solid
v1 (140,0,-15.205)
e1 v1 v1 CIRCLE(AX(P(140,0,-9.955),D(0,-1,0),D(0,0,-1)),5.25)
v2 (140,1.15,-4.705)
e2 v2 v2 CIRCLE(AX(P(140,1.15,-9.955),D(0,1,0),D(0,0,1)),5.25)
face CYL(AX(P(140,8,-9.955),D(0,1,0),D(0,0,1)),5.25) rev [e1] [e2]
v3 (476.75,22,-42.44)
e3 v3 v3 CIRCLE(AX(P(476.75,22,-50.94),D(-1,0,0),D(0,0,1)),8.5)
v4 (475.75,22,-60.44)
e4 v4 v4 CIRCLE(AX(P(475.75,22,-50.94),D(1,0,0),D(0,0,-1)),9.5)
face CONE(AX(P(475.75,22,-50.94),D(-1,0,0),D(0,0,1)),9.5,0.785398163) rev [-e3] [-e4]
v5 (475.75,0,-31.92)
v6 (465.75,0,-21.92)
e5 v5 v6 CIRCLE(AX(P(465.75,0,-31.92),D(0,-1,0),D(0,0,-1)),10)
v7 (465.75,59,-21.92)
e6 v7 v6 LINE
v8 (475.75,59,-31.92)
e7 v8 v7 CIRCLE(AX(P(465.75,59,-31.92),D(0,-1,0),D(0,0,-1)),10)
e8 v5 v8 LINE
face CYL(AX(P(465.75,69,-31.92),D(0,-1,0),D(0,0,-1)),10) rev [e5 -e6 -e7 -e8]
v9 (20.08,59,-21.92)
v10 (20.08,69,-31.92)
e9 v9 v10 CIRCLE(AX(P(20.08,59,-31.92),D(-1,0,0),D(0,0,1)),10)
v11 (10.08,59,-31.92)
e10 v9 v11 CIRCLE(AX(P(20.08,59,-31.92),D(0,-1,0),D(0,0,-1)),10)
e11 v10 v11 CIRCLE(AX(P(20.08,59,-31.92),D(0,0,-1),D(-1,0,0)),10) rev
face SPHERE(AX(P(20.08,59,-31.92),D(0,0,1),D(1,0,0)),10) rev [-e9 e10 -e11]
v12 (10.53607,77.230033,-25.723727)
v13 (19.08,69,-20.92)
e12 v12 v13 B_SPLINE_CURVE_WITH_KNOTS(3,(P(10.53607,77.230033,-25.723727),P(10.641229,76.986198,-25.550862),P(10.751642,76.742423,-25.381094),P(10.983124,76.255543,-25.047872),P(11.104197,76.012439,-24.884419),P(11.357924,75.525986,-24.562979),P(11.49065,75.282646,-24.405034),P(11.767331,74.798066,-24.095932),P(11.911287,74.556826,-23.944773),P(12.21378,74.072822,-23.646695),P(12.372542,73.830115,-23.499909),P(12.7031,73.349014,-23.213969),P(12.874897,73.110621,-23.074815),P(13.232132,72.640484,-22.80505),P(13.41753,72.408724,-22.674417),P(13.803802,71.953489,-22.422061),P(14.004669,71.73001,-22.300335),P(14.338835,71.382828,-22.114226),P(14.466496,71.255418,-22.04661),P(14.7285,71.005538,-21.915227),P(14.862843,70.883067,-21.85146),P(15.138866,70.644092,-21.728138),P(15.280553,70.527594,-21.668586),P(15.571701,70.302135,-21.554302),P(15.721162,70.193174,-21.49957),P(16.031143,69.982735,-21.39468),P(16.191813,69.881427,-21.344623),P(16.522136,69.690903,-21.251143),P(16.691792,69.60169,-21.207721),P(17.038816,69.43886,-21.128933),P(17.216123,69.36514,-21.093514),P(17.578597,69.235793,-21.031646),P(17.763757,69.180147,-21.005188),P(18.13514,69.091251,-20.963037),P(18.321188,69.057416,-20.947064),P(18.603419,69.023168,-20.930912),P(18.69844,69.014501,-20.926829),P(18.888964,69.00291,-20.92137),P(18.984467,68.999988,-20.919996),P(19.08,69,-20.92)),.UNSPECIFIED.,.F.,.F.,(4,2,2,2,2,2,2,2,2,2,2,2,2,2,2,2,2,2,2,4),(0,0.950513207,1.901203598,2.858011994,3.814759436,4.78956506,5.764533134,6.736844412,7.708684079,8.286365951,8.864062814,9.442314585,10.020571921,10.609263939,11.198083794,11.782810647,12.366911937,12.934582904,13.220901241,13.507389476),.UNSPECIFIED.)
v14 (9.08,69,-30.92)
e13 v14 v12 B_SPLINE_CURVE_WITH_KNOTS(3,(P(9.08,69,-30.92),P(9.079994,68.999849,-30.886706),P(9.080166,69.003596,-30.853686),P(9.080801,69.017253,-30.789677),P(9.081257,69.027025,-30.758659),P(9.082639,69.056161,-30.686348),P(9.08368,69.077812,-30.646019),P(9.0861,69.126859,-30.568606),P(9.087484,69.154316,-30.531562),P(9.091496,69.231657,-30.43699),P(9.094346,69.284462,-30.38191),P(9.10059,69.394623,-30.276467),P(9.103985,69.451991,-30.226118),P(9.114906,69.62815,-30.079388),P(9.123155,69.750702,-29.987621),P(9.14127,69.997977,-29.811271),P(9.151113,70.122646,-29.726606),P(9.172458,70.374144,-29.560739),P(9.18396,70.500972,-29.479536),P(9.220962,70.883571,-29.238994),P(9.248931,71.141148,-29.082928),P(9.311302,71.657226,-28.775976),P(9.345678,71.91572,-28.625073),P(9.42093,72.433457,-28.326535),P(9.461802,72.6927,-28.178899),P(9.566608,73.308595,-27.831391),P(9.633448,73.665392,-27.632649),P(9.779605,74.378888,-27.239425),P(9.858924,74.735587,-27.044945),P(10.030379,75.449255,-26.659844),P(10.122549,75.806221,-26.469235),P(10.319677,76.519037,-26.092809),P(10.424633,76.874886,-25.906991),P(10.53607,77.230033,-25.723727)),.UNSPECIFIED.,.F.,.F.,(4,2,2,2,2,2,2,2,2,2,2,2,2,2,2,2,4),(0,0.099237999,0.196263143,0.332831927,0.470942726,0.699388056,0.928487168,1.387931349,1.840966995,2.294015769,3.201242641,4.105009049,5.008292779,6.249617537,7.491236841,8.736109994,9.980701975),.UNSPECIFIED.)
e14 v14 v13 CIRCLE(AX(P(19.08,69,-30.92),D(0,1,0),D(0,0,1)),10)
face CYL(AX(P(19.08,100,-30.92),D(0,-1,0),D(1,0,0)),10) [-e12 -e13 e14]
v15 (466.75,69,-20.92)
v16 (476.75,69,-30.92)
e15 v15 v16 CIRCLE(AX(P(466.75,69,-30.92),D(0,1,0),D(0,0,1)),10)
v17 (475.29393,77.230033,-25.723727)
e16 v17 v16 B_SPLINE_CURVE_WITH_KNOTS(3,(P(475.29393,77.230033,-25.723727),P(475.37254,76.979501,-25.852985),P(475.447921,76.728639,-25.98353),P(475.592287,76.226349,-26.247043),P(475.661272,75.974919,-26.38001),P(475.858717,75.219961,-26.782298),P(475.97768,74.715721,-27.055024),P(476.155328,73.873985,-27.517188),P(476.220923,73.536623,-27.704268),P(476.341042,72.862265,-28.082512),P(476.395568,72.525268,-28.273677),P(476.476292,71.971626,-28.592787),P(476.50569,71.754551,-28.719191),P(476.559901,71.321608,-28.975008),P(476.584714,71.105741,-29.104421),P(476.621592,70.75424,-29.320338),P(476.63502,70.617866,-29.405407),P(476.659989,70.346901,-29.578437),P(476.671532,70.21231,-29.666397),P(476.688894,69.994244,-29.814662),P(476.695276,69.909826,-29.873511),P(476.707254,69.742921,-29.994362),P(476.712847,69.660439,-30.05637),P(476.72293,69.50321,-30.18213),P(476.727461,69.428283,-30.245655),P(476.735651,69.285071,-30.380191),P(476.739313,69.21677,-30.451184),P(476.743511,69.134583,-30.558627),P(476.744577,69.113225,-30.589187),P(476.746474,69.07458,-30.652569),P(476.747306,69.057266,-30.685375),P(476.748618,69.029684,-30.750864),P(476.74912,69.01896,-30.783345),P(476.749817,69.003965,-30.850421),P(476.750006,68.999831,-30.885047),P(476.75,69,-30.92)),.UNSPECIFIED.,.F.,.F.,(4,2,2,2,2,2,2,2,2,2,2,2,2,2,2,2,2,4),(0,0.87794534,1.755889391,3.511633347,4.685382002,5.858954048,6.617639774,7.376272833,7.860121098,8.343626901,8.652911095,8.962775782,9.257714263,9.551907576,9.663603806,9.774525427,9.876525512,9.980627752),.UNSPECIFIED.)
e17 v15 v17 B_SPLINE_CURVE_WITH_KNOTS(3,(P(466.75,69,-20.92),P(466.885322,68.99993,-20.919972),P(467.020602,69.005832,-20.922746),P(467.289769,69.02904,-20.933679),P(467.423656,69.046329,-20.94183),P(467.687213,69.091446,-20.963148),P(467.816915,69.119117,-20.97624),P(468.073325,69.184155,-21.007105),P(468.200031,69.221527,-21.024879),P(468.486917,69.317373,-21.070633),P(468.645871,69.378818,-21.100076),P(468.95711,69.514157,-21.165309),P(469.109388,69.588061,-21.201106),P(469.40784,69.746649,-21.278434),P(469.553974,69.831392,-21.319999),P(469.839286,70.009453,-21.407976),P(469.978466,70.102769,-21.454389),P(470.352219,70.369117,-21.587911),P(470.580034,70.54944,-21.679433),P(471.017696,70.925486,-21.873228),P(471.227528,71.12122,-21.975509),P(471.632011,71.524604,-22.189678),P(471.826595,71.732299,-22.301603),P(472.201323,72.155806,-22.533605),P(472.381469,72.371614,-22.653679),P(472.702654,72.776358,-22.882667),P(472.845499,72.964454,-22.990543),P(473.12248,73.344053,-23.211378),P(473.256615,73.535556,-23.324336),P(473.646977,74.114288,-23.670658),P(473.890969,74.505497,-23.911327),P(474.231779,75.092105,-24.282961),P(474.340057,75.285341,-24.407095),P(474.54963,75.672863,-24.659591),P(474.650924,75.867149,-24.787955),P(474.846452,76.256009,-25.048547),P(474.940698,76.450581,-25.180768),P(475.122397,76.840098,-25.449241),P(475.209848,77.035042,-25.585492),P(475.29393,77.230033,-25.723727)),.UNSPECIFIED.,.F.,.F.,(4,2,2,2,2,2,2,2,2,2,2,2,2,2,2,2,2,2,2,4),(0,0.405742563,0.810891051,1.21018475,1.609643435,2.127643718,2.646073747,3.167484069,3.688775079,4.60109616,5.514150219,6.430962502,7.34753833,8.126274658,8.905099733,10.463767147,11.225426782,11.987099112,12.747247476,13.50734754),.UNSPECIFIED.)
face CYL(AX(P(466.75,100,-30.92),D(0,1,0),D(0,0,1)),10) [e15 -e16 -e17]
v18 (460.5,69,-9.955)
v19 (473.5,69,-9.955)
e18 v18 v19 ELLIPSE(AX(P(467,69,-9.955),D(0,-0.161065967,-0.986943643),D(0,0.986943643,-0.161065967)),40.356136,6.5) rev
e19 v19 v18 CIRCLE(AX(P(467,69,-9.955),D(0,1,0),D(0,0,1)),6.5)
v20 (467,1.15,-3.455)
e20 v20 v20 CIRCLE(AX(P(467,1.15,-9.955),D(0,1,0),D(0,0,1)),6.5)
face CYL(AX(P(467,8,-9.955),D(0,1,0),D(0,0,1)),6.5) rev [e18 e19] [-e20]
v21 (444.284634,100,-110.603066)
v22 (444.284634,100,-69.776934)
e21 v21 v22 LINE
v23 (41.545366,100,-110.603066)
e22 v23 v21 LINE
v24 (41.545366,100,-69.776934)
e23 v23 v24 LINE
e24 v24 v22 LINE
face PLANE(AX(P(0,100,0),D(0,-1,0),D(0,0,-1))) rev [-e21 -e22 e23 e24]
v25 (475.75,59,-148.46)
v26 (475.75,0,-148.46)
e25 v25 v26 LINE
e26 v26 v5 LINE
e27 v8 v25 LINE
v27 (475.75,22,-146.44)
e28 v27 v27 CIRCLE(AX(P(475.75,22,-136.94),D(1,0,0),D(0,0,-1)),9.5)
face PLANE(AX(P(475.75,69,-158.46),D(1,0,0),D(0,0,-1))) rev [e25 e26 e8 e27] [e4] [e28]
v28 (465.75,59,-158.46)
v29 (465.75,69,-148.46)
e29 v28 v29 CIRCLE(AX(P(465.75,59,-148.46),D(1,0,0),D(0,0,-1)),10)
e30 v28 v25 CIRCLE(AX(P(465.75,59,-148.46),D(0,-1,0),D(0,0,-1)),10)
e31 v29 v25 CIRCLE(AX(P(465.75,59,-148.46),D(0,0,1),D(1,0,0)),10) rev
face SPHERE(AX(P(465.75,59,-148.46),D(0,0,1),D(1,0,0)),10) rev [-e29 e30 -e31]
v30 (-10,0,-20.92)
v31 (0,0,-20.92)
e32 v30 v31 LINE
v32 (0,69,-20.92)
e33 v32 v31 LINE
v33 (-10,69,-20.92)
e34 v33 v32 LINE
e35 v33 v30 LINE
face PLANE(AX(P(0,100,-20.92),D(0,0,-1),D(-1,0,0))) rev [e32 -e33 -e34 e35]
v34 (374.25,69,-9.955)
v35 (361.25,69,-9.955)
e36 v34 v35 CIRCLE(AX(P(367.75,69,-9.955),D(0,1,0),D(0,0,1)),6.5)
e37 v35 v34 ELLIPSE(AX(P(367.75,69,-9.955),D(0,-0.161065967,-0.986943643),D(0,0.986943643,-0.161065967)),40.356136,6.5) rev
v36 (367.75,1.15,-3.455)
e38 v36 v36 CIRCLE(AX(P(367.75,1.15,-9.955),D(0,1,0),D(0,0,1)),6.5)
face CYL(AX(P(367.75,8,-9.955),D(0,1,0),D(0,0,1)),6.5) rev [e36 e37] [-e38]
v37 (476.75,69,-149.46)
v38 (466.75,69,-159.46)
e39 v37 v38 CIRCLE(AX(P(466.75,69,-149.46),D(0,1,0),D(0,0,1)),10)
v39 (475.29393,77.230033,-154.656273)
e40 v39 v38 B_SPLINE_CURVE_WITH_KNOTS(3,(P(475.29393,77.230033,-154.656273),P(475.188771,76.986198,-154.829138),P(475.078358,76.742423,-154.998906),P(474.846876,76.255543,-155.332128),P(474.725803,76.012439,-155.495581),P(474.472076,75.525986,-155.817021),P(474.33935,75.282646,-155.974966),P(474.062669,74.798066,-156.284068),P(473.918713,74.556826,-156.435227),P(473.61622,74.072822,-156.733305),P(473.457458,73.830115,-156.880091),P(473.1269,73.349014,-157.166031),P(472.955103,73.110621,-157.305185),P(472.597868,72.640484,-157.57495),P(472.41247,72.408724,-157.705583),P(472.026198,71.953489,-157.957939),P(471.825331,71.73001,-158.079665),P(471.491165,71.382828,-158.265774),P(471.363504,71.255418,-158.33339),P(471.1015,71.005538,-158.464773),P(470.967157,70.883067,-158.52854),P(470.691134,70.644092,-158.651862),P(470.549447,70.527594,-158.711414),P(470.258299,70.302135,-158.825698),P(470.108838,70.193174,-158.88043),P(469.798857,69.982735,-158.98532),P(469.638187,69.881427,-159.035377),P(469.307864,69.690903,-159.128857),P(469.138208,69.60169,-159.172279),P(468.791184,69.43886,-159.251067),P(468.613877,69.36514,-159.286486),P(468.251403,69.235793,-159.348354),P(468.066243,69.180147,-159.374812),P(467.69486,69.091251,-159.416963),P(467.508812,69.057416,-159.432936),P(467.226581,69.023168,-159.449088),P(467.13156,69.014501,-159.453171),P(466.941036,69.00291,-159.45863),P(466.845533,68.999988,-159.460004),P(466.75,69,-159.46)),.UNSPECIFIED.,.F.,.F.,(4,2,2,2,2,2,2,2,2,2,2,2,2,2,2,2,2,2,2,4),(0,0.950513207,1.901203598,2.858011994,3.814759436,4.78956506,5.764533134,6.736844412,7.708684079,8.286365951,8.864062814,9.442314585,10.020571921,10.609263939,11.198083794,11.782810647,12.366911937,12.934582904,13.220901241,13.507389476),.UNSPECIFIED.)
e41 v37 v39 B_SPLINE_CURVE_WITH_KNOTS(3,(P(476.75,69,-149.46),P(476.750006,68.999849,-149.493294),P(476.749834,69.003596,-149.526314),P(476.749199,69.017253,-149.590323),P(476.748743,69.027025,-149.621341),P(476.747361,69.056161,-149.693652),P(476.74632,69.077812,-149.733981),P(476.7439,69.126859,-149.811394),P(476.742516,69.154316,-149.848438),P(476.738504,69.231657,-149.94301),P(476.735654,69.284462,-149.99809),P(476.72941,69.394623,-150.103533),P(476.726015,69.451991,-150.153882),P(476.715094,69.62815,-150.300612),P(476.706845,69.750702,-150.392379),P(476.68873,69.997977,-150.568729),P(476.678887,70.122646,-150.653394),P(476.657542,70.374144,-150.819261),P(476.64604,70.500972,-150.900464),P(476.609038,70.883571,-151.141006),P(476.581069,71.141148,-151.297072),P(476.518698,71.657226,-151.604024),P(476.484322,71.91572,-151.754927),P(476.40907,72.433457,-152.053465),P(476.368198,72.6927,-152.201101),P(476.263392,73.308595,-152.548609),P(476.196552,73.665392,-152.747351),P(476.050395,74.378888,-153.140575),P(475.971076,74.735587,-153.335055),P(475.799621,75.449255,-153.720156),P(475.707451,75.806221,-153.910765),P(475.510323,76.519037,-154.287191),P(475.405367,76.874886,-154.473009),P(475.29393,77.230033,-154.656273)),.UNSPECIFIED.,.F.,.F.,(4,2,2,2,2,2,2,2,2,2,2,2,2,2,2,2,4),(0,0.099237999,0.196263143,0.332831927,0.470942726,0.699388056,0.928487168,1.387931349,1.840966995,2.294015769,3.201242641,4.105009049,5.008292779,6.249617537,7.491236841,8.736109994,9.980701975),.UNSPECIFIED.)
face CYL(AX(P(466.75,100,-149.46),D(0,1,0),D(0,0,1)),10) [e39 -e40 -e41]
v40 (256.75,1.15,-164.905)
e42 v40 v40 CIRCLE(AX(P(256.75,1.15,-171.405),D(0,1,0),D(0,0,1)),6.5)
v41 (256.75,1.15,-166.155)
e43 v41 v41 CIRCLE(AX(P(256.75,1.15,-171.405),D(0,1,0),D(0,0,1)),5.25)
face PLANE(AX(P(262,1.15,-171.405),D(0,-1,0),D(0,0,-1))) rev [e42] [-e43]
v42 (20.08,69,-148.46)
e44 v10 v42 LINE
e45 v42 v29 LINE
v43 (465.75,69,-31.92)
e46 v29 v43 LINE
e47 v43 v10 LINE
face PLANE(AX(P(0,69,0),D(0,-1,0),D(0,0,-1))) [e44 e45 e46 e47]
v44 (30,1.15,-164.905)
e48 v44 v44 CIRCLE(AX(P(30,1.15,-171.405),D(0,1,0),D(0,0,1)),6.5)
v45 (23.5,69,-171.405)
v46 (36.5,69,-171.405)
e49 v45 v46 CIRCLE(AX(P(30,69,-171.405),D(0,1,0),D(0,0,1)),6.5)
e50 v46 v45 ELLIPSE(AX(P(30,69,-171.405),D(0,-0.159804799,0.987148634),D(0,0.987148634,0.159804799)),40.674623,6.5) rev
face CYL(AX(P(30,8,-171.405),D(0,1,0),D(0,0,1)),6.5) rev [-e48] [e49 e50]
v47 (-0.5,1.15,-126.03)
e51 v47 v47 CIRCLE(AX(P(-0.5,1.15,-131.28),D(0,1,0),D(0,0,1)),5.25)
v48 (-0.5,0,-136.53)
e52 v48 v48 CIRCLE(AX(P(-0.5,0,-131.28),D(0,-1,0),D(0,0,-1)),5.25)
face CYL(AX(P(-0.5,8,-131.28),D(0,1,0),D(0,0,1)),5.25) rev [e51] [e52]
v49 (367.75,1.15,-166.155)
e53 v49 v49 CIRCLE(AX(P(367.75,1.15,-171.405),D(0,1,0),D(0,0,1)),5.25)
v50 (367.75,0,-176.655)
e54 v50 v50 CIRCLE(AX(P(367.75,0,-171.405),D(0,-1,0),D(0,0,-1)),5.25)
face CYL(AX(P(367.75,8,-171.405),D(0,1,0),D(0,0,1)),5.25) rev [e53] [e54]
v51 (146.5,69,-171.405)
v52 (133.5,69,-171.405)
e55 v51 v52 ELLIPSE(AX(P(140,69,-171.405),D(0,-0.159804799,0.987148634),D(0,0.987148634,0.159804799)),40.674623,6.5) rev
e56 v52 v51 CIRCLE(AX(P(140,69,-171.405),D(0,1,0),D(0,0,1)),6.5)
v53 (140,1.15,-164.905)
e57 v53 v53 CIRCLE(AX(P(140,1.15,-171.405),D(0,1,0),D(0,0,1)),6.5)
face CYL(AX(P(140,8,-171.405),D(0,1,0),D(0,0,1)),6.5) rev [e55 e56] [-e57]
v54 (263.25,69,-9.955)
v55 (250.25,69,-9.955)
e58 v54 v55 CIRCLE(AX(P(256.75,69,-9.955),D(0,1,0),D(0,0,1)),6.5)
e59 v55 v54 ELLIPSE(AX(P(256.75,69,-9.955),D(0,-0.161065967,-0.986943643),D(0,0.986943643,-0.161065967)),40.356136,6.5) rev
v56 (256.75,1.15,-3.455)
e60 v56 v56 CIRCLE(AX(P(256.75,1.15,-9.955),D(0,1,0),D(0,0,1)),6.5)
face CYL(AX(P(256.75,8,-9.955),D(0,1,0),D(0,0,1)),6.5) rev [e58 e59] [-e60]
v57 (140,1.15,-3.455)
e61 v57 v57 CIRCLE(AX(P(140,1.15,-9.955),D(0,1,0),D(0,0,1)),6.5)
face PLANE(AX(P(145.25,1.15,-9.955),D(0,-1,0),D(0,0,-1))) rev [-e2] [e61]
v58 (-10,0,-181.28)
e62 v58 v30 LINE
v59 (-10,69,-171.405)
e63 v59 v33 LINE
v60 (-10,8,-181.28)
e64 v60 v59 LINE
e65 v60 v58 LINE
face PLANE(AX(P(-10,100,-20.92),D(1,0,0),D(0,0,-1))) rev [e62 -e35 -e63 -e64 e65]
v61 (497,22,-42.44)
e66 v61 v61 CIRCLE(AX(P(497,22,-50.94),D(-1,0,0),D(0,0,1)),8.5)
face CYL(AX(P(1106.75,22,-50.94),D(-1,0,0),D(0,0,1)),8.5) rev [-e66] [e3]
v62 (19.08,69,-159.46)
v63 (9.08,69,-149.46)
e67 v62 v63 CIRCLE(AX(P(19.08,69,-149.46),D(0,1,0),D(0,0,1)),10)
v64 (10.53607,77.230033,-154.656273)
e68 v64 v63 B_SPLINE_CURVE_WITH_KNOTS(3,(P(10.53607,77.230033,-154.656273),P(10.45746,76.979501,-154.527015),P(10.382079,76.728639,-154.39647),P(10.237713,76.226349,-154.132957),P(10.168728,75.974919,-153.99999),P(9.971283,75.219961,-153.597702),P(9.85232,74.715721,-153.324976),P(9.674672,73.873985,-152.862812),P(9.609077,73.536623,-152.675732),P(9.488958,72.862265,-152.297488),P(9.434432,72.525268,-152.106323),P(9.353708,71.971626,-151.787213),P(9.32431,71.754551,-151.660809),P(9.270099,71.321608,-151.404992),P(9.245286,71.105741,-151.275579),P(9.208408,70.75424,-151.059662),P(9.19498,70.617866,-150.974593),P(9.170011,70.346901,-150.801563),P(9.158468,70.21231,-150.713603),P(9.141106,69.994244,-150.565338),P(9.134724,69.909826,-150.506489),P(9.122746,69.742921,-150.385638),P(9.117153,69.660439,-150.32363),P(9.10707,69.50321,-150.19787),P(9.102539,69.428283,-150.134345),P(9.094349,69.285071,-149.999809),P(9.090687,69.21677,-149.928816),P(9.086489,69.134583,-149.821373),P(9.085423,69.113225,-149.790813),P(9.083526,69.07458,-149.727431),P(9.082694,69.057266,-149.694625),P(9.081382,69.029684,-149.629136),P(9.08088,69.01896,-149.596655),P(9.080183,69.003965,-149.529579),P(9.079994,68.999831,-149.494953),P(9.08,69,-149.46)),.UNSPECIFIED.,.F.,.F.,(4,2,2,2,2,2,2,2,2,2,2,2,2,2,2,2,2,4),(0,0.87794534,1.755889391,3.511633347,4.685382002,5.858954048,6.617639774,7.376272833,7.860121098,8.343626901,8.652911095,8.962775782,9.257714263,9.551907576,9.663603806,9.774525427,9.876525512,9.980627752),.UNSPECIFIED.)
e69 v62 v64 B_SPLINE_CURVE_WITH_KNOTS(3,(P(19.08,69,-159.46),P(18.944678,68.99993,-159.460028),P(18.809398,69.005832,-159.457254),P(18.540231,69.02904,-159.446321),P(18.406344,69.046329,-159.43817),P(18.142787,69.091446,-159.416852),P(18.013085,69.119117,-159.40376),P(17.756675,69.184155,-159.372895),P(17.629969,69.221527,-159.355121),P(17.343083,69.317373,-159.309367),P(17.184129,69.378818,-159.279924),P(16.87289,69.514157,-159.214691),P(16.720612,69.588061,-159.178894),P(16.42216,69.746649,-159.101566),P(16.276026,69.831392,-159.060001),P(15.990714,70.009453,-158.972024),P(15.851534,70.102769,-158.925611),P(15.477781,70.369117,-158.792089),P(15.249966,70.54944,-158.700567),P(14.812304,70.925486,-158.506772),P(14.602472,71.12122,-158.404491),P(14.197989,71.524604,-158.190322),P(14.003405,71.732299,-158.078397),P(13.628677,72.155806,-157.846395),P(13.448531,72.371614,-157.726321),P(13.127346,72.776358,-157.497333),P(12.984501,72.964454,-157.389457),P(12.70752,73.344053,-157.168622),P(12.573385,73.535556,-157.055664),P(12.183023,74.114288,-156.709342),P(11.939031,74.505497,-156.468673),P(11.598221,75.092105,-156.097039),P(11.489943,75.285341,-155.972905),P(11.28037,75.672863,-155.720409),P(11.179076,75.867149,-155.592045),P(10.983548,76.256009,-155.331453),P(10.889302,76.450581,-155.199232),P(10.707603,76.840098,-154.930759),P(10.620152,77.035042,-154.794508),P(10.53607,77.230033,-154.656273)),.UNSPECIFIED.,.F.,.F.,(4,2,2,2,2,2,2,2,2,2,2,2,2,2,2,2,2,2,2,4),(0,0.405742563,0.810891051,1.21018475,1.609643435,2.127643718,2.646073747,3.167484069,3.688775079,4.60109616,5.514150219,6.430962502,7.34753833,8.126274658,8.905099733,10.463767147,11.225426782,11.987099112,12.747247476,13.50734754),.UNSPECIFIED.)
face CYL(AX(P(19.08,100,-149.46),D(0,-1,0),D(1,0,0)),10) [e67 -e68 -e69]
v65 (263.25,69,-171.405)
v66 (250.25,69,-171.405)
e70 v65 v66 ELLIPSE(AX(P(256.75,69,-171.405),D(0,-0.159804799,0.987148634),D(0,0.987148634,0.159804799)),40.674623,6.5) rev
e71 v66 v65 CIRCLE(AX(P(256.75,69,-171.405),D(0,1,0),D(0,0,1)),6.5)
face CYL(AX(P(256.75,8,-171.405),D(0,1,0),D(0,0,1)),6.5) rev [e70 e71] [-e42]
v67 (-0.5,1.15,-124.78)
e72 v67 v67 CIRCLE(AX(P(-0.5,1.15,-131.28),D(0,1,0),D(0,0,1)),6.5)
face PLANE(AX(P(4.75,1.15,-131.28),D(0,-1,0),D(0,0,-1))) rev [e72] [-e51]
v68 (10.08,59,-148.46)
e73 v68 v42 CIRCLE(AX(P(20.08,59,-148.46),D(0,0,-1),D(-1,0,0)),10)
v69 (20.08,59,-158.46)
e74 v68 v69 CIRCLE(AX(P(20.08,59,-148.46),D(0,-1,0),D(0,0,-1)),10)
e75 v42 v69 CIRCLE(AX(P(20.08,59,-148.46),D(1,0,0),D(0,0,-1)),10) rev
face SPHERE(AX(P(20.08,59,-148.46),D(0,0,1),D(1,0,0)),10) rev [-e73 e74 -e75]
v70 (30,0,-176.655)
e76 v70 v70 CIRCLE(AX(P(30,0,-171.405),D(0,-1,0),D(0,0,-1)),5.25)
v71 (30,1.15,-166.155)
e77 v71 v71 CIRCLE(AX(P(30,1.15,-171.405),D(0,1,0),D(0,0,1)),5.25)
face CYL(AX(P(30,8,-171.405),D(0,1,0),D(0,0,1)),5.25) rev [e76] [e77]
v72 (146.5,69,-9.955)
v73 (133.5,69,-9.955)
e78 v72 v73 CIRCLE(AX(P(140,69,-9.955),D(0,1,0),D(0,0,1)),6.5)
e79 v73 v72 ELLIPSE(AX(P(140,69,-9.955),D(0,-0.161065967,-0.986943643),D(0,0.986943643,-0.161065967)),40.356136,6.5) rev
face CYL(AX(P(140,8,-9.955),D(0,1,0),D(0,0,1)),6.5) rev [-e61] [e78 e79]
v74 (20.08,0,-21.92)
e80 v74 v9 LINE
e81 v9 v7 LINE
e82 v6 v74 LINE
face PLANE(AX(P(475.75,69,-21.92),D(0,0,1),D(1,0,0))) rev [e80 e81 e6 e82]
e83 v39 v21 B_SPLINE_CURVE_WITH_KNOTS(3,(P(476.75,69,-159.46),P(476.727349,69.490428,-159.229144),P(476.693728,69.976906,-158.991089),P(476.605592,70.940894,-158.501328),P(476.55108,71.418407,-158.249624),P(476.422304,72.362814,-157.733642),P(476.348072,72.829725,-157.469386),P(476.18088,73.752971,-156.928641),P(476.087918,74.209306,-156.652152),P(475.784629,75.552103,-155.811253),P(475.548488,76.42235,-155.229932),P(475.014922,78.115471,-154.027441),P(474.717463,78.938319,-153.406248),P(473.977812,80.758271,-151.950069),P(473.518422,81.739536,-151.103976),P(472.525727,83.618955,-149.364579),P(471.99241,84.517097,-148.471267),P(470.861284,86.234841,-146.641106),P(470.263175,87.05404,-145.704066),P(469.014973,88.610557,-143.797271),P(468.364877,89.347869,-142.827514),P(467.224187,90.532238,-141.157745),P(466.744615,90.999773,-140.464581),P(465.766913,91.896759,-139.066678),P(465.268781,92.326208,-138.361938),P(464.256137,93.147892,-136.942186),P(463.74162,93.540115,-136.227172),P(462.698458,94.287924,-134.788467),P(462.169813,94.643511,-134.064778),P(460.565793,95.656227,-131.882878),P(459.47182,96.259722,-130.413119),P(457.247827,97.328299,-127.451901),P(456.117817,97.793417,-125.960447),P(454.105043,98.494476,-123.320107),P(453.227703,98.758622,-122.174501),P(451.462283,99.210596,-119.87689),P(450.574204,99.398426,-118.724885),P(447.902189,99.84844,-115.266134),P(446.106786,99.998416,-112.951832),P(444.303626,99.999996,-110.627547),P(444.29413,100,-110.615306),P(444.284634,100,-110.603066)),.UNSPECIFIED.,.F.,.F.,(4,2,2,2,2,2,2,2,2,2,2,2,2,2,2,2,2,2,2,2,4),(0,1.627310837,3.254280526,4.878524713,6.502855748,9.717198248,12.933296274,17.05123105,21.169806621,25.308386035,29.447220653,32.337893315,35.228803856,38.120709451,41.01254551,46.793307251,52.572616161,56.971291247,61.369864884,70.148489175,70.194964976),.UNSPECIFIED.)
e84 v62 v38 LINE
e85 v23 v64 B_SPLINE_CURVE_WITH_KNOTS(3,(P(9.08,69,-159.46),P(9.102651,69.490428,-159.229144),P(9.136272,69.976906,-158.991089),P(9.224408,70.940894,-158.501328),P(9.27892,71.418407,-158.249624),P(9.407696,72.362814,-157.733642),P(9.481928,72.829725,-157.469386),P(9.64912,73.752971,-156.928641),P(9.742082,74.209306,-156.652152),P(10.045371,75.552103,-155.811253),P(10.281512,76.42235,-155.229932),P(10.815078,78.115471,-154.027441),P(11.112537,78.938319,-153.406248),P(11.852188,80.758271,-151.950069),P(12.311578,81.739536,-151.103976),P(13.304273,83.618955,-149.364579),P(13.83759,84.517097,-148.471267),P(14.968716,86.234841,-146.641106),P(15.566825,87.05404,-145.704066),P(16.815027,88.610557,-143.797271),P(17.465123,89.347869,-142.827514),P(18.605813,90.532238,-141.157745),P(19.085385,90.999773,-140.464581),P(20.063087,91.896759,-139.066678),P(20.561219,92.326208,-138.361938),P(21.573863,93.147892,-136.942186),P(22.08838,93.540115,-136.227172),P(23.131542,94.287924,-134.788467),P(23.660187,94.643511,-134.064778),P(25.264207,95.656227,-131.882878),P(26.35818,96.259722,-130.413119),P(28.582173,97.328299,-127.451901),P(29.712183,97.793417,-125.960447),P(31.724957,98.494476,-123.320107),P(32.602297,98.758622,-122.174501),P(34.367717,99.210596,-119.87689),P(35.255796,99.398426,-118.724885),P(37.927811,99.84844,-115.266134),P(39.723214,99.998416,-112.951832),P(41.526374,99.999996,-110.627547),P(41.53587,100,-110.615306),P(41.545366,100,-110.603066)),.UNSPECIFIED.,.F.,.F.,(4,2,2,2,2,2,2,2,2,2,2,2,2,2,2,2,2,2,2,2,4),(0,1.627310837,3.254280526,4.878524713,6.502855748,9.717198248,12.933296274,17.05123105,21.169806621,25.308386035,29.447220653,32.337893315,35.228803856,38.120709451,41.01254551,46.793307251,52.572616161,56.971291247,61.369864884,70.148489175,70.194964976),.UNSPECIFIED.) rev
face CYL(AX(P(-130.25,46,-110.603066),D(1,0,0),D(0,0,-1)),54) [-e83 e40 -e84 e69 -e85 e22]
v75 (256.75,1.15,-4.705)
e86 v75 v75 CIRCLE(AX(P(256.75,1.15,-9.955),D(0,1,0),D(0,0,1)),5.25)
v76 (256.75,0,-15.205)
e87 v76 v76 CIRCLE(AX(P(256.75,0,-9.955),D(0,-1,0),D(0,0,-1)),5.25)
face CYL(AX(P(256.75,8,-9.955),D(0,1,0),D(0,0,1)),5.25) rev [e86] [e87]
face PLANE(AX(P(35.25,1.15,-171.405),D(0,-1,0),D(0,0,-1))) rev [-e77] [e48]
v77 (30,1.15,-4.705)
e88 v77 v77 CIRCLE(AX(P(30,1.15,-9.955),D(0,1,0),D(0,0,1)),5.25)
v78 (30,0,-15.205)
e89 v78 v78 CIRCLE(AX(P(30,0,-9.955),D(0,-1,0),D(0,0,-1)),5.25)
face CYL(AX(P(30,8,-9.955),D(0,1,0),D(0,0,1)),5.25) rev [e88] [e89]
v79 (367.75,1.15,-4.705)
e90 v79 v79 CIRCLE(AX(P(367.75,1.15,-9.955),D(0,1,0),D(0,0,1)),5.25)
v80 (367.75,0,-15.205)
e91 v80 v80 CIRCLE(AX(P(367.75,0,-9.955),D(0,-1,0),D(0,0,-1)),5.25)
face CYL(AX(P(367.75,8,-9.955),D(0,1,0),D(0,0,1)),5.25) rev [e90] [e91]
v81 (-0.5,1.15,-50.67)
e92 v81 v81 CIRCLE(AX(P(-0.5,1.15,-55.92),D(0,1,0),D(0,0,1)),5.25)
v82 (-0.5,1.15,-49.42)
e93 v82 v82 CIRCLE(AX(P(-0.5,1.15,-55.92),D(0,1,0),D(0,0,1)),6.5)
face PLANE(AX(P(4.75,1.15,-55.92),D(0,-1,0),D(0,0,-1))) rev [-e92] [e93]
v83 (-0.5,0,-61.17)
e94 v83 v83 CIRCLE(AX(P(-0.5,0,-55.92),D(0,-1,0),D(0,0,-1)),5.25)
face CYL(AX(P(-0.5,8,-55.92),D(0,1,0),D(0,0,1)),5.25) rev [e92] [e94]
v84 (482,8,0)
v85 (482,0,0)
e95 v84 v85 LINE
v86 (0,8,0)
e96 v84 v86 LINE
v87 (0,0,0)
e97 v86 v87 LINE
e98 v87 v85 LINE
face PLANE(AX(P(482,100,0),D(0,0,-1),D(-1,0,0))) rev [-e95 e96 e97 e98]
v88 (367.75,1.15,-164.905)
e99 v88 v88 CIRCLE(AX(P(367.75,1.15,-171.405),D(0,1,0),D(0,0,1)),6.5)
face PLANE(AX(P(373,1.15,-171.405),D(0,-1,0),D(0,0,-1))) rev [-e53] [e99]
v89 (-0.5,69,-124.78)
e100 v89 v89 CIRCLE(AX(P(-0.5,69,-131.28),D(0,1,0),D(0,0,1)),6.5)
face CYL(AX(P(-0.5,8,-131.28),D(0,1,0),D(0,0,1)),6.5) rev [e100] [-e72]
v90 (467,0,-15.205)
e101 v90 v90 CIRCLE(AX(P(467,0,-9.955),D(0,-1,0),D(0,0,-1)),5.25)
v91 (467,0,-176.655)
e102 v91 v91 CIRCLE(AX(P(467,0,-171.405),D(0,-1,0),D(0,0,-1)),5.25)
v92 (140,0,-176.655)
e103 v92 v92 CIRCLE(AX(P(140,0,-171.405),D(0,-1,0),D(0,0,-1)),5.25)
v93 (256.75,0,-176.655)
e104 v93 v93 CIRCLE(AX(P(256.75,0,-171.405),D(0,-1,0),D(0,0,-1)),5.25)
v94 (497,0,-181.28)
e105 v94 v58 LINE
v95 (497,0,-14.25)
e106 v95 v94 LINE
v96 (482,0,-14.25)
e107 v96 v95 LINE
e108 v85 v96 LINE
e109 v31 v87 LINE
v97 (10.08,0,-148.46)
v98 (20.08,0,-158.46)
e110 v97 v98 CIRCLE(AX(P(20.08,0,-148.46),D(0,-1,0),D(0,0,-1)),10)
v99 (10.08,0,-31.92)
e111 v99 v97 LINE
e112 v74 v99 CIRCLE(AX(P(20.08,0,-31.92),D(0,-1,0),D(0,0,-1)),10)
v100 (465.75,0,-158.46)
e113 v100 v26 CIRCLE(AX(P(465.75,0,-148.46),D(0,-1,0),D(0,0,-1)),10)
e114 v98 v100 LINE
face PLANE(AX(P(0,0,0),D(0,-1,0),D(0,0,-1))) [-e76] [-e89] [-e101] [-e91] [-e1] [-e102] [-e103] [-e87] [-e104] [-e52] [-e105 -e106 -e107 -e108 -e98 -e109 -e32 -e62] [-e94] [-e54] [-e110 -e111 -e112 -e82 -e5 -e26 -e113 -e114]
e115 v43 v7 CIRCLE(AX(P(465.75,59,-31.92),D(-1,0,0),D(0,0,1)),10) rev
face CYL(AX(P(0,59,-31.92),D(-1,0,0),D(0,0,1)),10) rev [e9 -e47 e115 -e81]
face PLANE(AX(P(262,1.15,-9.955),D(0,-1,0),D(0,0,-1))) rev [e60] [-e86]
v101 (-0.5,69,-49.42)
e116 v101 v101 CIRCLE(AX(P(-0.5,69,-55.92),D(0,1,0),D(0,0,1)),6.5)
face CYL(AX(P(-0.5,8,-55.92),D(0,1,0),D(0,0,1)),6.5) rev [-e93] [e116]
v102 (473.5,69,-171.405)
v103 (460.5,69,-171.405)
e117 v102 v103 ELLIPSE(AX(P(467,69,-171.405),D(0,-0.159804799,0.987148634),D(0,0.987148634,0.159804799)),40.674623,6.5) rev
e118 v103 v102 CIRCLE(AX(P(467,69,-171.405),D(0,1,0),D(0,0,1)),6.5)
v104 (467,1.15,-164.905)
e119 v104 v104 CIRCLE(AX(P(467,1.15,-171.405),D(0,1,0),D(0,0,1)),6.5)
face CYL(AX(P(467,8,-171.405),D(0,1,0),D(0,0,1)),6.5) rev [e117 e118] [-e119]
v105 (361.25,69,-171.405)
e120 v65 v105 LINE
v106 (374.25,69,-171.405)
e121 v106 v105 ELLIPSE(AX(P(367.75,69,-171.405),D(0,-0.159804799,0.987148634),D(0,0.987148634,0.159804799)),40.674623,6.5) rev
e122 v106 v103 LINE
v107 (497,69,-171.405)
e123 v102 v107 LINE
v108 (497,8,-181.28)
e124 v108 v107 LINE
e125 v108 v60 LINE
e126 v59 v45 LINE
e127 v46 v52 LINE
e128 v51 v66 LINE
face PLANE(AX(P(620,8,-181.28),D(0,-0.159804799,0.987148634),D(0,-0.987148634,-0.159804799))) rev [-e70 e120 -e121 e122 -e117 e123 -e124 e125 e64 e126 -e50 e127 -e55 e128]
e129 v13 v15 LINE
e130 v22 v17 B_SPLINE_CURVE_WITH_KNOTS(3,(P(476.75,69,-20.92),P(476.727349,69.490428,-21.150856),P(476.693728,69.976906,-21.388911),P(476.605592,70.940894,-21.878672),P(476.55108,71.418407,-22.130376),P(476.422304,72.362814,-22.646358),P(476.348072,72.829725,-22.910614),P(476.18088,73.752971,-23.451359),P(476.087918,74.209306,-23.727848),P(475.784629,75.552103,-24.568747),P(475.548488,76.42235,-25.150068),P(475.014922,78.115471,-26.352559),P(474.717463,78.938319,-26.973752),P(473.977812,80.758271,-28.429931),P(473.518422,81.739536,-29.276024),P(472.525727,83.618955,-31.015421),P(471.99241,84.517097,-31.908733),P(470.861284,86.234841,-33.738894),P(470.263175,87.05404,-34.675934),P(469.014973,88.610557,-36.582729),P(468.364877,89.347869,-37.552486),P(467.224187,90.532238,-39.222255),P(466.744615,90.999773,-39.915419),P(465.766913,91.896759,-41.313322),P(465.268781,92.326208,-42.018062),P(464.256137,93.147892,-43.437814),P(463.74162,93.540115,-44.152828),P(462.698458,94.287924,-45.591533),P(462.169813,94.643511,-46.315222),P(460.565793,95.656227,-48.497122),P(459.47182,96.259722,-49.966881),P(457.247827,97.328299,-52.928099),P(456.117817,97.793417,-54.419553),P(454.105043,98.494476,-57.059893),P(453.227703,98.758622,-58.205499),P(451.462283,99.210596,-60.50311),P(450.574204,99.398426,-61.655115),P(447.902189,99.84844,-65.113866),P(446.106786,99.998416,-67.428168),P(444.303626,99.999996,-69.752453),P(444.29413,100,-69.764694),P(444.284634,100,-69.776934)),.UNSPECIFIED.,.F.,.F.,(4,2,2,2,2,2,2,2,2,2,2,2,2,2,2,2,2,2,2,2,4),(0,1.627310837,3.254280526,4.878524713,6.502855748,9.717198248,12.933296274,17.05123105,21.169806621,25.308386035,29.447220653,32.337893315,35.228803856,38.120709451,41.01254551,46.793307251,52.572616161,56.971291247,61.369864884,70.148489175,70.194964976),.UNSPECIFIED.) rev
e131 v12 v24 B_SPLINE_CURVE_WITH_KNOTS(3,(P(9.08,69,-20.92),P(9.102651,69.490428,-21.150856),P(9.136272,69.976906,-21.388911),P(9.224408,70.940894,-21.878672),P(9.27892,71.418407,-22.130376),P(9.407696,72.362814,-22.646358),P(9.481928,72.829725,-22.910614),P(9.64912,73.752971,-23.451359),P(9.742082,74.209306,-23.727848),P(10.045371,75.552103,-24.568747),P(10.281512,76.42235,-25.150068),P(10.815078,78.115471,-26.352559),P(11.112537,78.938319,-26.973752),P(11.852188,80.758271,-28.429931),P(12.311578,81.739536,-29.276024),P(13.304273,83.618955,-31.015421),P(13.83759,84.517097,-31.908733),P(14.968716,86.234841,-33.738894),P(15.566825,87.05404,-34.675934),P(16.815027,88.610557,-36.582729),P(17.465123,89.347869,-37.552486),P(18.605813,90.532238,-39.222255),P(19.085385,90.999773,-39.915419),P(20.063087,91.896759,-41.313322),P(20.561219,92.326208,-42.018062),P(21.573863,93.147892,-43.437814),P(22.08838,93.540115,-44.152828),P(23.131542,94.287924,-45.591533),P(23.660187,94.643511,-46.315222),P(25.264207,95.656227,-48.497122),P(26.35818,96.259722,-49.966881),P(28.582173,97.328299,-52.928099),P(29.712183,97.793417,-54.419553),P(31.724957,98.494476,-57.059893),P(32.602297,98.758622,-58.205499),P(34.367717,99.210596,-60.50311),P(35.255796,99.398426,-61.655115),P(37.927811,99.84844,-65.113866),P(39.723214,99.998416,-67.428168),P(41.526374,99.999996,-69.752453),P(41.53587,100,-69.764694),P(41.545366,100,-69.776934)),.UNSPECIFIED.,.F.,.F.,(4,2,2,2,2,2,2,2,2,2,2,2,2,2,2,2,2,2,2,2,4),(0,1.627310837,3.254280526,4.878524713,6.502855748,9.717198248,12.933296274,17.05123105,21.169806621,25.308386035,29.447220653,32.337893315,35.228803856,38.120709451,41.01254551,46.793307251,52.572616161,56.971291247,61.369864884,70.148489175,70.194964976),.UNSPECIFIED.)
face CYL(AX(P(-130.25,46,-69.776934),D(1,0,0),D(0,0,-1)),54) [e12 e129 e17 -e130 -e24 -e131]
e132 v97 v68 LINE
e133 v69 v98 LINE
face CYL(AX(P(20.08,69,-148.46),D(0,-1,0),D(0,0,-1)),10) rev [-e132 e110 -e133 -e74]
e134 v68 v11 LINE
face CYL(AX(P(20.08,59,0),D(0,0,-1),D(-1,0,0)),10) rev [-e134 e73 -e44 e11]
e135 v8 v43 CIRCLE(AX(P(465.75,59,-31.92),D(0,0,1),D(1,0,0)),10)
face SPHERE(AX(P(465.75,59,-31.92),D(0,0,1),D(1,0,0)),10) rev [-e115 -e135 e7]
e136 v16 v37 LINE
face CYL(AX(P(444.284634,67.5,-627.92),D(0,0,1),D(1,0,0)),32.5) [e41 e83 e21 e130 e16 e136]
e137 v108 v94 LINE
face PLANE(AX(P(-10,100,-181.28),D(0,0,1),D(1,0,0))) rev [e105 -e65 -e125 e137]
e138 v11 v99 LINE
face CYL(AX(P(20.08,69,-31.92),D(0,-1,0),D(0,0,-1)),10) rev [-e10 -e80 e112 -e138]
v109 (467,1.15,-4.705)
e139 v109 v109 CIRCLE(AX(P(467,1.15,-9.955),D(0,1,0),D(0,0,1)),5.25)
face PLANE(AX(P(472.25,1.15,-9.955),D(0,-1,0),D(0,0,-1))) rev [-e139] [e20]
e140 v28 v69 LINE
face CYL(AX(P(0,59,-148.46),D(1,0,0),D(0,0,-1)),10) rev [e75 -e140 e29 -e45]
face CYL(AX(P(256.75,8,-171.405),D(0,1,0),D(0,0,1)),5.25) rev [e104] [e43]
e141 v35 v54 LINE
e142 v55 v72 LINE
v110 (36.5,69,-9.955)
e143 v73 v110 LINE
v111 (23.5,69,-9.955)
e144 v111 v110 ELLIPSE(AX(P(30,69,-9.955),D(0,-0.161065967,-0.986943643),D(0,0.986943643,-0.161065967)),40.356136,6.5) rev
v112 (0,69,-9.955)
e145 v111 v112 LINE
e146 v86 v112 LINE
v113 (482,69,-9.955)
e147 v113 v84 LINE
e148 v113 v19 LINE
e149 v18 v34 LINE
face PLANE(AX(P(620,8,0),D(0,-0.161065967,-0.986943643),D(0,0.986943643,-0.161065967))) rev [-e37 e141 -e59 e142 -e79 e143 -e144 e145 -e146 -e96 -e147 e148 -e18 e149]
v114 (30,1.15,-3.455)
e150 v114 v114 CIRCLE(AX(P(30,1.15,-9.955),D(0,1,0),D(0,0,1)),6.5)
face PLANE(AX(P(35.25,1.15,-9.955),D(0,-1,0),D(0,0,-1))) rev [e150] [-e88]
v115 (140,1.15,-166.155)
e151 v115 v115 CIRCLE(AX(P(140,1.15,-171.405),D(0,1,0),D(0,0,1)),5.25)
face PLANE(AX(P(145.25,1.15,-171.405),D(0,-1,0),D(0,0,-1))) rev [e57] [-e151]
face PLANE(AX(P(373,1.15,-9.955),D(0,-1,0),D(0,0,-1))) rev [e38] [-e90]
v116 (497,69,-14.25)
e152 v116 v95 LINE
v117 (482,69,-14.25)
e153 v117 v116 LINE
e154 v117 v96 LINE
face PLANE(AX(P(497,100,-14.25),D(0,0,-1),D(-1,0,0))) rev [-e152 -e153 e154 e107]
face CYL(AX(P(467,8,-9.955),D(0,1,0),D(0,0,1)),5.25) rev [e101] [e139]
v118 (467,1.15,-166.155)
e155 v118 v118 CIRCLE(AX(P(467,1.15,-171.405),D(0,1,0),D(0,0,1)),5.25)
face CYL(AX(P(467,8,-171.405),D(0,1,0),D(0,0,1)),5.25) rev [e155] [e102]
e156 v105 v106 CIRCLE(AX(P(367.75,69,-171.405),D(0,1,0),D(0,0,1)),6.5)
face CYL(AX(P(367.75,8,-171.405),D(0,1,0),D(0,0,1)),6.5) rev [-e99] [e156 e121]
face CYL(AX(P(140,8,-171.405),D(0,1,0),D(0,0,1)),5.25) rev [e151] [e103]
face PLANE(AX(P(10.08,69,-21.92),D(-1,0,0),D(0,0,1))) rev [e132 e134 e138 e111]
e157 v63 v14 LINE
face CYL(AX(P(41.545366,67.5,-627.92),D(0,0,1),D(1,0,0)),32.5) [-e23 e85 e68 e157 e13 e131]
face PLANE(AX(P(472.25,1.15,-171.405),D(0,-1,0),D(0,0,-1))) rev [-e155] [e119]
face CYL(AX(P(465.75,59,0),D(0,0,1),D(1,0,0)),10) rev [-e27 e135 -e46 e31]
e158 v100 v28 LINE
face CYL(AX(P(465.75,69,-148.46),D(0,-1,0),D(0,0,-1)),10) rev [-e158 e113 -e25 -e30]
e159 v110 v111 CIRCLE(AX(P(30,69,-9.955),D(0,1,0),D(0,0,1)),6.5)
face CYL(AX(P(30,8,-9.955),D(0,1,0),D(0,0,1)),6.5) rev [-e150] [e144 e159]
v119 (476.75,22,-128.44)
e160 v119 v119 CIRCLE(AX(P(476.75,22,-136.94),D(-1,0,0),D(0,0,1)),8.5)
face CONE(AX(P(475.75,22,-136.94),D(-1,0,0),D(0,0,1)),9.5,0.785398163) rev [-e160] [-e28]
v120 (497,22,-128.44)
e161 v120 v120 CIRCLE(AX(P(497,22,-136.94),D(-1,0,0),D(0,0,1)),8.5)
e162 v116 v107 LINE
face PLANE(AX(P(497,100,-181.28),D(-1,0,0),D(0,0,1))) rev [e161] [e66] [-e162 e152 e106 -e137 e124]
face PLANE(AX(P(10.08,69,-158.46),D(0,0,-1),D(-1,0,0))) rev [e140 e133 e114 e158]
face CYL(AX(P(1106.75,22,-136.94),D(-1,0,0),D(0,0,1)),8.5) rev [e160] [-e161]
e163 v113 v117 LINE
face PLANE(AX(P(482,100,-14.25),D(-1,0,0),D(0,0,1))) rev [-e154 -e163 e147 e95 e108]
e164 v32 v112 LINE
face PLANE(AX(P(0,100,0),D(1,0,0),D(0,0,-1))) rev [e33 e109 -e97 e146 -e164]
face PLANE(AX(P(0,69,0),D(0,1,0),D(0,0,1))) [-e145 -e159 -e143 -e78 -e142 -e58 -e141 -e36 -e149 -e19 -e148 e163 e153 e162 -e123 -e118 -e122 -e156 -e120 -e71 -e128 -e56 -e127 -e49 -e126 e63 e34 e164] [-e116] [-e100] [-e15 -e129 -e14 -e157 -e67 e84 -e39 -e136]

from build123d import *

# Parameters (mm, degrees)
SALIENTE_EXTRUIR1_DEPTH                              = 100
CROQUIS3_W                                           = 20.92
CROQUIS3_H                                           = 92
CORTAR_EXTRUIR1_DEPTH                                = 798
CROQUIS4_W                                           = 19.08
CROQUIS4_H                                           = 92
CROQUIS4_W_2                                         = 20.25
CORTAR_EXTRUIR2_DEPTH                                = 798
CROQUIS5_W                                           = 465.67
CROQUIS5_H                                           = 136.54
CORTAR_EXTRUIR3_DEPTH                                = 69
REFRENTADO_PARA_PERNO_CON_CABEZA_HEXAGON_D           = 10.5
REFRENTADO_PARA_PERNO_CON_CABEZA_HEXAGON_DEPTH       = 90
REFRENTADO_PARA_PERNO_CON_CABEZA_HEXAGON_CBORE_D     = 13
REFRENTADO_PARA_PERNO_CON_CABEZA_HEXAGON_CBORE_DEPTH = 6.85
REFRENTADO_PARA_PERNO_CON_CABEZA_HEXAGON_TIP         = 3.15451825
CROQUIS8_R                                           = 8.5
CORTAR_EXTRUIR4_DEPTH                                = 69
CORTAR_EXTRUIR5_DEPTH                                = 607
CORTAR_EXTRUIR6_START                                = -138.5400001
CORTAR_EXTRUIR6_DEPTH                                = 138.5400001
REDONDEO1_R                                          = 10
REDONDEO2_R                                          = 10
REDONDEO3_R                                          = 10
REDONDEO4_R                                          = 10
REDONDEO5_R                                          = 10
CHAFL_N1_SIZE                                        = 1
REDONDEO6_R                                          = 10
SALIENTE_EXTRUIR2_DEPTH                              = 61
CROQUIS12_R                                          = 6.5
CORTAR_EXTRUIR7_DEPTH                                = 61
CORTAR_EXTRUIR8_DEPTH                                = 630
CORTAR_EXTRUIR9_START                                = -630
CROQUIS14_R                                          = 8.5
CORTAR_EXTRUIR9_DEPTH                                = 630


# Read off the part's stored shape, not the designer's step: Cortar-Extruir6
# Some blends are built 0.0001 mm under size
with BuildPart() as part:
    # Croquis2 → Saliente-Extruir1 (new body)
    with BuildSketch(Plane(origin=(0, 0, 0), x_dir=(1, 0, 0), z_dir=(0, 1, 0))):
        Polygon((-10, 20.92), (-10, 181.28), (497, 181.28), (497, 14.25), (482, 14.25), (482, 0), (0, 0), (0, 20.92), align=None)
    extrude(amount=SALIENTE_EXTRUIR1_DEPTH)

    # Croquis3 → Cortar-Extruir1 (cut)
    with BuildSketch(Plane.ZY.offset(10)):
        Polygon((-181.28, 100), (-181.28, 8), (-159.46, 8), (-159.46, 100), (-159.605192294, 100), align=None)
        with Locations((-10.46, 54)):
            Rectangle(CROQUIS3_W, CROQUIS3_H)
    extrude(amount=-CORTAR_EXTRUIR1_DEPTH, mode=Mode.SUBTRACT)

    # Croquis4 → Cortar-Extruir2 (cut)
    with BuildSketch(Plane(origin=(0, 0, -159.46), x_dir=(-1, 0, 0), z_dir=(0, 0, -1))):
        with Locations((0.46, 54)):
            Rectangle(CROQUIS4_W, CROQUIS4_H)
        with Locations((-486.875, 54)):
            Rectangle(CROQUIS4_W_2, CROQUIS4_H)
    extrude(amount=-CORTAR_EXTRUIR2_DEPTH, mode=Mode.SUBTRACT)

    # Croquis5 → Cortar-Extruir3 (cut)
    with BuildSketch(Plane.XZ):
        with Locations((242.915, -90.19)):
            Rectangle(CROQUIS5_W, CROQUIS5_H)
    extrude(amount=-CORTAR_EXTRUIR3_DEPTH, mode=Mode.SUBTRACT)

    # Refrentado para perno con cabeza hexagonal de M101
    with Locations(Plane(origin=(-0.5, 8, -131.28), x_dir=(0, 0, 1), z_dir=(0, 1, 0))):
        with Locations((0, 0), (75.36, 0), (121.325, 30.5), (121.325, 140.5), (121.325, 257.25), (121.325, 368.25), (121.325, 467.5), (-40.125, 467.5), (-40.125, 368.25), (-40.125, 257.25), (-40.125, 140.5), (-40.125, 30.5)):
            CounterBoreHole(REFRENTADO_PARA_PERNO_CON_CABEZA_HEXAGON_D / 2, REFRENTADO_PARA_PERNO_CON_CABEZA_HEXAGON_CBORE_D / 2, REFRENTADO_PARA_PERNO_CON_CABEZA_HEXAGON_CBORE_DEPTH, depth=REFRENTADO_PARA_PERNO_CON_CABEZA_HEXAGON_DEPTH)
            with Locations((0, 0, -(REFRENTADO_PARA_PERNO_CON_CABEZA_HEXAGON_DEPTH + REFRENTADO_PARA_PERNO_CON_CABEZA_HEXAGON_TIP / 2))):  # 118° drill point
                Cone(0, REFRENTADO_PARA_PERNO_CON_CABEZA_HEXAGON_D / 2, REFRENTADO_PARA_PERNO_CON_CABEZA_HEXAGON_TIP, mode=Mode.SUBTRACT)

    # Croquis8 → Cortar-Extruir4 (cut)
    with BuildSketch(Plane(origin=(476.75, 0, 0), x_dir=(0, 0, -1), z_dir=(1, 0, 0))):
        with Locations((50.94, 22)):
            Circle(CROQUIS8_R)
        with Locations((136.94, 22)):
            Circle(CROQUIS8_R)
    extrude(amount=-CORTAR_EXTRUIR4_DEPTH, mode=Mode.SUBTRACT)

    # Croquis9 → Cortar-Extruir5 (cut)
    with BuildSketch(Plane(origin=(476.75, 0, 0), x_dir=(0, 0, -1), z_dir=(1, 0, 0))):
        with BuildLine():
            Line((20.92, 69), (20.92, 100))
            Line((20.92, 100), (69.776934001, 100))
            ThreePointArc((69.776934001, 100), (40.845981718, 91.596052461), (20.92, 69))
        make_face()
        with BuildLine():
            Line((110.603065999, 100), (159.46, 100))
            Line((159.46, 100), (159.46, 69))
            ThreePointArc((159.46, 69), (139.534018282, 91.596052461), (110.603065999, 100))
        make_face()
    extrude(amount=-CORTAR_EXTRUIR5_DEPTH, mode=Mode.SUBTRACT)

    # Cortar-Extruir6 outline → Cortar-Extruir6 (cut)
    with BuildSketch(Plane.XY.offset(-20.92).offset(CORTAR_EXTRUIR6_START)):
        with BuildLine():
            Line((476.75, 100), (444.284633839, 100))
            ThreePointArc((444.284633839, 100), (466.729009526, 91.005318547), (476.75, 69))
            Line((476.75, 69), (476.75, 100))
        make_face()
        with BuildLine():
            ThreePointArc((9.08, 69), (19.100990474, 91.005318547), (41.545366161, 100))
            Line((41.545366161, 100), (9.08, 100))
            Line((9.08, 100), (9.08, 69))
        make_face()
    extrude(amount=CORTAR_EXTRUIR6_DEPTH, mode=Mode.SUBTRACT)

    # Redondeo1
    redondeo1_edges = [part.edges().sort_by_distance(p)[0] for p in [
        (475.75, 69, -90.19),
        (242.915, 69, -158.46),
        (10.08, 69, -90.19),
        (242.915, 69, -21.92),
    ]]
    fillet(redondeo1_edges, radius=REDONDEO1_R)

    # Redondeo2
    # the kernel refuses this fillet: 10 mm, written as the material it adds along each edge
    with BuildSketch(Plane(origin=(20.08, 59, -31.92), x_dir=(-1, 0, 0), z_dir=(0, 0, 1))) as redondeo2_piece_1_section:
        Polygon((0, 0), (REDONDEO2_R, 0), (REDONDEO2_R, -REDONDEO2_R), (0, -REDONDEO2_R), align=None)
    redondeo2_piece_1 = extrude(amount=REDONDEO2_R, mode=Mode.PRIVATE)
    redondeo2_piece_1 = redondeo2_piece_1 - Plane(origin=(20.08, 59, -31.92), x_dir=(0.7071067811865475, -0.7071067811865475, 0), z_dir=(0, 0, 1)) * Sphere(REDONDEO2_R, mode=Mode.PRIVATE)
    add(redondeo2_piece_1)
    with BuildSketch(Plane(origin=(10.08, 0, -21.92), x_dir=(1, 0, 0), z_dir=(0, 1, 0))) as redondeo2_piece_2:
        with BuildLine():
            CenterArc((REDONDEO2_R, REDONDEO2_R), REDONDEO2_R, 180, 90)
            Line((0, REDONDEO2_R), (0, 0))
            Line((0, 0), (REDONDEO2_R, 0))
        make_face()
    extrude(amount=59)

    # Redondeo3
    # the kernel refuses this fillet: 10 mm, written as the material it adds along each edge
    with BuildSketch(Plane(origin=(465.75, 59, -31.92), x_dir=(1, 0, 0), z_dir=(0, 0, 1))) as redondeo3_piece_1_section:
        Polygon((0, 0), (REDONDEO3_R, 0), (REDONDEO3_R, REDONDEO3_R), (0, REDONDEO3_R), align=None)
    redondeo3_piece_1 = extrude(amount=REDONDEO3_R, mode=Mode.PRIVATE)
    redondeo3_piece_1 = redondeo3_piece_1 - Plane(origin=(465.75, 59, -31.92), x_dir=(-0.7071067811865475, -0.7071067811865475, 0), z_dir=(0, 0, 1)) * Sphere(REDONDEO3_R, mode=Mode.PRIVATE)
    add(redondeo3_piece_1)
    with BuildSketch(Plane(origin=(475.75, 0, -21.92), x_dir=(-1, 0, 0), z_dir=(0, 1, 0))) as redondeo3_piece_2:
        with BuildLine():
            CenterArc((REDONDEO3_R, -REDONDEO3_R), REDONDEO3_R, 90, 90)
            Line((0, -REDONDEO3_R), (0, 0))
            Line((0, 0), (REDONDEO3_R, 0))
        make_face()
    extrude(amount=59)

    # Redondeo4
    # the kernel refuses this fillet: 10 mm, written as the material it adds along each edge
    with BuildSketch(Plane(origin=(465.75, 59, -148.46), x_dir=(0, 0, -1), z_dir=(1, 0, 0))) as redondeo4_piece_1_section:
        Polygon((0, 0), (REDONDEO4_R, 0), (REDONDEO4_R, REDONDEO4_R), (0, REDONDEO4_R), align=None)
    redondeo4_piece_1 = extrude(amount=REDONDEO4_R, mode=Mode.PRIVATE)
    redondeo4_piece_1 = redondeo4_piece_1 - Plane(origin=(465.75, 59, -148.46), x_dir=(0, -0.7071067811865475, 0.7071067811865475), z_dir=(1, 0, 0)) * Sphere(REDONDEO4_R, mode=Mode.PRIVATE)
    add(redondeo4_piece_1)
    with BuildSketch(Plane(origin=(475.75, 0, -158.46), x_dir=(0, 0, 1), z_dir=(0, 1, 0))) as redondeo4_piece_2:
        with BuildLine():
            CenterArc((REDONDEO4_R, -REDONDEO4_R), REDONDEO4_R, 90, 90)
            Line((0, -REDONDEO4_R), (0, 0))
            Line((0, 0), (REDONDEO4_R, 0))
        make_face()
    extrude(amount=59)

    # Redondeo5
    # the kernel refuses this fillet: 10 mm, written as the material it adds along each edge
    with BuildSketch(Plane(origin=(20.08, 59, -148.46), x_dir=(-1, 0, 0), z_dir=(0, 0, -1))) as redondeo5_piece_1_section:
        Polygon((0, 0), (REDONDEO5_R, 0), (REDONDEO5_R, REDONDEO5_R), (0, REDONDEO5_R), align=None)
    redondeo5_piece_1 = extrude(amount=REDONDEO5_R, mode=Mode.PRIVATE)
    redondeo5_piece_1 = redondeo5_piece_1 - Plane(origin=(20.08, 59, -148.46), x_dir=(0.7071067811865475, -0.7071067811865475, 0), z_dir=(0, 0, -1)) * Sphere(REDONDEO5_R, mode=Mode.PRIVATE)
    add(redondeo5_piece_1)
    with BuildSketch(Plane(origin=(10.08, 0, -158.46), x_dir=(1, 0, 0), z_dir=(0, 1, 0))) as redondeo5_piece_2:
        with BuildLine():
            CenterArc((REDONDEO5_R, -REDONDEO5_R), REDONDEO5_R, 90, 90)
            Line((0, -REDONDEO5_R), (0, 0))
            Line((0, 0), (REDONDEO5_R, 0))
        make_face()
    extrude(amount=59)

    # Chaflán1
    chafl_n1_edges = [part.edges().sort_by_distance(p)[0] for p in [
        (475.75, 22, -42.44),
        (475.75, 22, -128.44),
    ]]
    chamfer(chafl_n1_edges, length=CHAFL_N1_SIZE - 0.0001)  # a hair under: the kernel refuses the full size

    # Redondeo6
    redondeo6_edges = [part.edges().sort_by_distance(p)[0] for p in [
        (9.08, 38.5, -20.92),
        (9.08, 38.5, -159.46),
        (476.75, 38.5, -20.92),
        (476.75, 38.5, -159.46),
    ]]
    fillet(redondeo6_edges, radius=REDONDEO6_R)

    # Croquis11 → Saliente-Extruir2 (add)
    with BuildSketch(Plane(origin=(0, 8, 0), x_dir=(1, 0, 0), z_dir=(0, 1, 0))):
        Polygon((482, 0), (482, 14.25), (497, 14.25), (497, 181.28), (-10, 181.28), (-10, 20.92), (0, 20.92), (0, 0), align=None)
        with BuildLine():
            Line((466.75, 20.92), (19.08, 20.92))
            ThreePointArc((19.08, 20.92), (12.008932188, 23.848932188), (9.08, 30.92))
            Line((9.08, 30.92), (9.08, 149.46))
            ThreePointArc((9.08, 149.46), (12.008932188, 156.531067812), (19.08, 159.46))
            Line((19.08, 159.46), (466.75, 159.46))
            ThreePointArc((466.75, 159.46), (473.821067812, 156.531067812), (476.75, 149.46))
            Line((476.75, 149.46), (476.75, 30.92))
            ThreePointArc((476.75, 30.92), (473.821067812, 23.848932188), (466.75, 20.92))
        make_face(mode=Mode.SUBTRACT)
    extrude(amount=SALIENTE_EXTRUIR2_DEPTH)

    # Croquis12 → Cortar-Extruir7 (cut)
    with BuildSketch(Plane(origin=(0, 69, 0), x_dir=(1, 0, 0), z_dir=(0, 1, 0))):
        with Locations(Location((30, 171.405, 0), (0, 0, 270))):
            Circle(CROQUIS12_R)
        with Locations(Location((-0.5, 131.28, 0), (0, 0, 270))):
            Circle(CROQUIS12_R)
        with Locations(Location((256.75, 171.405, 0), (0, 0, 270))):
            Circle(CROQUIS12_R)
        with Locations(Location((367.75, 171.405, 0), (0, 0, 270))):
            Circle(CROQUIS12_R)
        with Locations(Location((467, 171.405, 0), (0, 0, 270))):
            Circle(CROQUIS12_R)
        with Locations(Location((467, 9.955, 0), (0, 0, 270))):
            Circle(CROQUIS12_R)
        with Locations(Location((367.75, 9.955, 0), (0, 0, 270))):
            Circle(CROQUIS12_R)
        with Locations(Location((256.75, 9.955, 0), (0, 0, 270))):
            Circle(CROQUIS12_R)
        with Locations(Location((140, 9.955, 0), (0, 0, 270))):
            Circle(CROQUIS12_R)
        with Locations(Location((30, 9.955, 0), (0, 0, 270))):
            Circle(CROQUIS12_R)
        with Locations(Location((140, 171.405, 0), (0, 0, 270))):
            Circle(CROQUIS12_R)
        with Locations(Location((-0.5, 55.92, 0), (0, 0, 270))):
            Circle(CROQUIS12_R)
    extrude(amount=-CORTAR_EXTRUIR7_DEPTH, mode=Mode.SUBTRACT)

    # Croquis13 → Cortar-Extruir8 (cut)
    with BuildSketch(Plane.ZY.offset(10)):
        Polygon((-181.28, 8), (-171.405, 69), (-181.28, 69), align=None)
        Polygon((0, 8), (-9.955, 69), (0, 69), align=None)
    extrude(amount=-CORTAR_EXTRUIR8_DEPTH, mode=Mode.SUBTRACT)

    # Croquis14 → Cortar-Extruir9 (cut)
    with BuildSketch(Plane.ZY.offset(-476.75).offset(CORTAR_EXTRUIR9_START)):
        with Locations((-136.94, 22)):
            Circle(CROQUIS14_R)
        with Locations((-50.94, 22)):
            Circle(CROQUIS14_R)
    extrude(amount=CORTAR_EXTRUIR9_DEPTH, mode=Mode.SUBTRACT)


solid = part.part
